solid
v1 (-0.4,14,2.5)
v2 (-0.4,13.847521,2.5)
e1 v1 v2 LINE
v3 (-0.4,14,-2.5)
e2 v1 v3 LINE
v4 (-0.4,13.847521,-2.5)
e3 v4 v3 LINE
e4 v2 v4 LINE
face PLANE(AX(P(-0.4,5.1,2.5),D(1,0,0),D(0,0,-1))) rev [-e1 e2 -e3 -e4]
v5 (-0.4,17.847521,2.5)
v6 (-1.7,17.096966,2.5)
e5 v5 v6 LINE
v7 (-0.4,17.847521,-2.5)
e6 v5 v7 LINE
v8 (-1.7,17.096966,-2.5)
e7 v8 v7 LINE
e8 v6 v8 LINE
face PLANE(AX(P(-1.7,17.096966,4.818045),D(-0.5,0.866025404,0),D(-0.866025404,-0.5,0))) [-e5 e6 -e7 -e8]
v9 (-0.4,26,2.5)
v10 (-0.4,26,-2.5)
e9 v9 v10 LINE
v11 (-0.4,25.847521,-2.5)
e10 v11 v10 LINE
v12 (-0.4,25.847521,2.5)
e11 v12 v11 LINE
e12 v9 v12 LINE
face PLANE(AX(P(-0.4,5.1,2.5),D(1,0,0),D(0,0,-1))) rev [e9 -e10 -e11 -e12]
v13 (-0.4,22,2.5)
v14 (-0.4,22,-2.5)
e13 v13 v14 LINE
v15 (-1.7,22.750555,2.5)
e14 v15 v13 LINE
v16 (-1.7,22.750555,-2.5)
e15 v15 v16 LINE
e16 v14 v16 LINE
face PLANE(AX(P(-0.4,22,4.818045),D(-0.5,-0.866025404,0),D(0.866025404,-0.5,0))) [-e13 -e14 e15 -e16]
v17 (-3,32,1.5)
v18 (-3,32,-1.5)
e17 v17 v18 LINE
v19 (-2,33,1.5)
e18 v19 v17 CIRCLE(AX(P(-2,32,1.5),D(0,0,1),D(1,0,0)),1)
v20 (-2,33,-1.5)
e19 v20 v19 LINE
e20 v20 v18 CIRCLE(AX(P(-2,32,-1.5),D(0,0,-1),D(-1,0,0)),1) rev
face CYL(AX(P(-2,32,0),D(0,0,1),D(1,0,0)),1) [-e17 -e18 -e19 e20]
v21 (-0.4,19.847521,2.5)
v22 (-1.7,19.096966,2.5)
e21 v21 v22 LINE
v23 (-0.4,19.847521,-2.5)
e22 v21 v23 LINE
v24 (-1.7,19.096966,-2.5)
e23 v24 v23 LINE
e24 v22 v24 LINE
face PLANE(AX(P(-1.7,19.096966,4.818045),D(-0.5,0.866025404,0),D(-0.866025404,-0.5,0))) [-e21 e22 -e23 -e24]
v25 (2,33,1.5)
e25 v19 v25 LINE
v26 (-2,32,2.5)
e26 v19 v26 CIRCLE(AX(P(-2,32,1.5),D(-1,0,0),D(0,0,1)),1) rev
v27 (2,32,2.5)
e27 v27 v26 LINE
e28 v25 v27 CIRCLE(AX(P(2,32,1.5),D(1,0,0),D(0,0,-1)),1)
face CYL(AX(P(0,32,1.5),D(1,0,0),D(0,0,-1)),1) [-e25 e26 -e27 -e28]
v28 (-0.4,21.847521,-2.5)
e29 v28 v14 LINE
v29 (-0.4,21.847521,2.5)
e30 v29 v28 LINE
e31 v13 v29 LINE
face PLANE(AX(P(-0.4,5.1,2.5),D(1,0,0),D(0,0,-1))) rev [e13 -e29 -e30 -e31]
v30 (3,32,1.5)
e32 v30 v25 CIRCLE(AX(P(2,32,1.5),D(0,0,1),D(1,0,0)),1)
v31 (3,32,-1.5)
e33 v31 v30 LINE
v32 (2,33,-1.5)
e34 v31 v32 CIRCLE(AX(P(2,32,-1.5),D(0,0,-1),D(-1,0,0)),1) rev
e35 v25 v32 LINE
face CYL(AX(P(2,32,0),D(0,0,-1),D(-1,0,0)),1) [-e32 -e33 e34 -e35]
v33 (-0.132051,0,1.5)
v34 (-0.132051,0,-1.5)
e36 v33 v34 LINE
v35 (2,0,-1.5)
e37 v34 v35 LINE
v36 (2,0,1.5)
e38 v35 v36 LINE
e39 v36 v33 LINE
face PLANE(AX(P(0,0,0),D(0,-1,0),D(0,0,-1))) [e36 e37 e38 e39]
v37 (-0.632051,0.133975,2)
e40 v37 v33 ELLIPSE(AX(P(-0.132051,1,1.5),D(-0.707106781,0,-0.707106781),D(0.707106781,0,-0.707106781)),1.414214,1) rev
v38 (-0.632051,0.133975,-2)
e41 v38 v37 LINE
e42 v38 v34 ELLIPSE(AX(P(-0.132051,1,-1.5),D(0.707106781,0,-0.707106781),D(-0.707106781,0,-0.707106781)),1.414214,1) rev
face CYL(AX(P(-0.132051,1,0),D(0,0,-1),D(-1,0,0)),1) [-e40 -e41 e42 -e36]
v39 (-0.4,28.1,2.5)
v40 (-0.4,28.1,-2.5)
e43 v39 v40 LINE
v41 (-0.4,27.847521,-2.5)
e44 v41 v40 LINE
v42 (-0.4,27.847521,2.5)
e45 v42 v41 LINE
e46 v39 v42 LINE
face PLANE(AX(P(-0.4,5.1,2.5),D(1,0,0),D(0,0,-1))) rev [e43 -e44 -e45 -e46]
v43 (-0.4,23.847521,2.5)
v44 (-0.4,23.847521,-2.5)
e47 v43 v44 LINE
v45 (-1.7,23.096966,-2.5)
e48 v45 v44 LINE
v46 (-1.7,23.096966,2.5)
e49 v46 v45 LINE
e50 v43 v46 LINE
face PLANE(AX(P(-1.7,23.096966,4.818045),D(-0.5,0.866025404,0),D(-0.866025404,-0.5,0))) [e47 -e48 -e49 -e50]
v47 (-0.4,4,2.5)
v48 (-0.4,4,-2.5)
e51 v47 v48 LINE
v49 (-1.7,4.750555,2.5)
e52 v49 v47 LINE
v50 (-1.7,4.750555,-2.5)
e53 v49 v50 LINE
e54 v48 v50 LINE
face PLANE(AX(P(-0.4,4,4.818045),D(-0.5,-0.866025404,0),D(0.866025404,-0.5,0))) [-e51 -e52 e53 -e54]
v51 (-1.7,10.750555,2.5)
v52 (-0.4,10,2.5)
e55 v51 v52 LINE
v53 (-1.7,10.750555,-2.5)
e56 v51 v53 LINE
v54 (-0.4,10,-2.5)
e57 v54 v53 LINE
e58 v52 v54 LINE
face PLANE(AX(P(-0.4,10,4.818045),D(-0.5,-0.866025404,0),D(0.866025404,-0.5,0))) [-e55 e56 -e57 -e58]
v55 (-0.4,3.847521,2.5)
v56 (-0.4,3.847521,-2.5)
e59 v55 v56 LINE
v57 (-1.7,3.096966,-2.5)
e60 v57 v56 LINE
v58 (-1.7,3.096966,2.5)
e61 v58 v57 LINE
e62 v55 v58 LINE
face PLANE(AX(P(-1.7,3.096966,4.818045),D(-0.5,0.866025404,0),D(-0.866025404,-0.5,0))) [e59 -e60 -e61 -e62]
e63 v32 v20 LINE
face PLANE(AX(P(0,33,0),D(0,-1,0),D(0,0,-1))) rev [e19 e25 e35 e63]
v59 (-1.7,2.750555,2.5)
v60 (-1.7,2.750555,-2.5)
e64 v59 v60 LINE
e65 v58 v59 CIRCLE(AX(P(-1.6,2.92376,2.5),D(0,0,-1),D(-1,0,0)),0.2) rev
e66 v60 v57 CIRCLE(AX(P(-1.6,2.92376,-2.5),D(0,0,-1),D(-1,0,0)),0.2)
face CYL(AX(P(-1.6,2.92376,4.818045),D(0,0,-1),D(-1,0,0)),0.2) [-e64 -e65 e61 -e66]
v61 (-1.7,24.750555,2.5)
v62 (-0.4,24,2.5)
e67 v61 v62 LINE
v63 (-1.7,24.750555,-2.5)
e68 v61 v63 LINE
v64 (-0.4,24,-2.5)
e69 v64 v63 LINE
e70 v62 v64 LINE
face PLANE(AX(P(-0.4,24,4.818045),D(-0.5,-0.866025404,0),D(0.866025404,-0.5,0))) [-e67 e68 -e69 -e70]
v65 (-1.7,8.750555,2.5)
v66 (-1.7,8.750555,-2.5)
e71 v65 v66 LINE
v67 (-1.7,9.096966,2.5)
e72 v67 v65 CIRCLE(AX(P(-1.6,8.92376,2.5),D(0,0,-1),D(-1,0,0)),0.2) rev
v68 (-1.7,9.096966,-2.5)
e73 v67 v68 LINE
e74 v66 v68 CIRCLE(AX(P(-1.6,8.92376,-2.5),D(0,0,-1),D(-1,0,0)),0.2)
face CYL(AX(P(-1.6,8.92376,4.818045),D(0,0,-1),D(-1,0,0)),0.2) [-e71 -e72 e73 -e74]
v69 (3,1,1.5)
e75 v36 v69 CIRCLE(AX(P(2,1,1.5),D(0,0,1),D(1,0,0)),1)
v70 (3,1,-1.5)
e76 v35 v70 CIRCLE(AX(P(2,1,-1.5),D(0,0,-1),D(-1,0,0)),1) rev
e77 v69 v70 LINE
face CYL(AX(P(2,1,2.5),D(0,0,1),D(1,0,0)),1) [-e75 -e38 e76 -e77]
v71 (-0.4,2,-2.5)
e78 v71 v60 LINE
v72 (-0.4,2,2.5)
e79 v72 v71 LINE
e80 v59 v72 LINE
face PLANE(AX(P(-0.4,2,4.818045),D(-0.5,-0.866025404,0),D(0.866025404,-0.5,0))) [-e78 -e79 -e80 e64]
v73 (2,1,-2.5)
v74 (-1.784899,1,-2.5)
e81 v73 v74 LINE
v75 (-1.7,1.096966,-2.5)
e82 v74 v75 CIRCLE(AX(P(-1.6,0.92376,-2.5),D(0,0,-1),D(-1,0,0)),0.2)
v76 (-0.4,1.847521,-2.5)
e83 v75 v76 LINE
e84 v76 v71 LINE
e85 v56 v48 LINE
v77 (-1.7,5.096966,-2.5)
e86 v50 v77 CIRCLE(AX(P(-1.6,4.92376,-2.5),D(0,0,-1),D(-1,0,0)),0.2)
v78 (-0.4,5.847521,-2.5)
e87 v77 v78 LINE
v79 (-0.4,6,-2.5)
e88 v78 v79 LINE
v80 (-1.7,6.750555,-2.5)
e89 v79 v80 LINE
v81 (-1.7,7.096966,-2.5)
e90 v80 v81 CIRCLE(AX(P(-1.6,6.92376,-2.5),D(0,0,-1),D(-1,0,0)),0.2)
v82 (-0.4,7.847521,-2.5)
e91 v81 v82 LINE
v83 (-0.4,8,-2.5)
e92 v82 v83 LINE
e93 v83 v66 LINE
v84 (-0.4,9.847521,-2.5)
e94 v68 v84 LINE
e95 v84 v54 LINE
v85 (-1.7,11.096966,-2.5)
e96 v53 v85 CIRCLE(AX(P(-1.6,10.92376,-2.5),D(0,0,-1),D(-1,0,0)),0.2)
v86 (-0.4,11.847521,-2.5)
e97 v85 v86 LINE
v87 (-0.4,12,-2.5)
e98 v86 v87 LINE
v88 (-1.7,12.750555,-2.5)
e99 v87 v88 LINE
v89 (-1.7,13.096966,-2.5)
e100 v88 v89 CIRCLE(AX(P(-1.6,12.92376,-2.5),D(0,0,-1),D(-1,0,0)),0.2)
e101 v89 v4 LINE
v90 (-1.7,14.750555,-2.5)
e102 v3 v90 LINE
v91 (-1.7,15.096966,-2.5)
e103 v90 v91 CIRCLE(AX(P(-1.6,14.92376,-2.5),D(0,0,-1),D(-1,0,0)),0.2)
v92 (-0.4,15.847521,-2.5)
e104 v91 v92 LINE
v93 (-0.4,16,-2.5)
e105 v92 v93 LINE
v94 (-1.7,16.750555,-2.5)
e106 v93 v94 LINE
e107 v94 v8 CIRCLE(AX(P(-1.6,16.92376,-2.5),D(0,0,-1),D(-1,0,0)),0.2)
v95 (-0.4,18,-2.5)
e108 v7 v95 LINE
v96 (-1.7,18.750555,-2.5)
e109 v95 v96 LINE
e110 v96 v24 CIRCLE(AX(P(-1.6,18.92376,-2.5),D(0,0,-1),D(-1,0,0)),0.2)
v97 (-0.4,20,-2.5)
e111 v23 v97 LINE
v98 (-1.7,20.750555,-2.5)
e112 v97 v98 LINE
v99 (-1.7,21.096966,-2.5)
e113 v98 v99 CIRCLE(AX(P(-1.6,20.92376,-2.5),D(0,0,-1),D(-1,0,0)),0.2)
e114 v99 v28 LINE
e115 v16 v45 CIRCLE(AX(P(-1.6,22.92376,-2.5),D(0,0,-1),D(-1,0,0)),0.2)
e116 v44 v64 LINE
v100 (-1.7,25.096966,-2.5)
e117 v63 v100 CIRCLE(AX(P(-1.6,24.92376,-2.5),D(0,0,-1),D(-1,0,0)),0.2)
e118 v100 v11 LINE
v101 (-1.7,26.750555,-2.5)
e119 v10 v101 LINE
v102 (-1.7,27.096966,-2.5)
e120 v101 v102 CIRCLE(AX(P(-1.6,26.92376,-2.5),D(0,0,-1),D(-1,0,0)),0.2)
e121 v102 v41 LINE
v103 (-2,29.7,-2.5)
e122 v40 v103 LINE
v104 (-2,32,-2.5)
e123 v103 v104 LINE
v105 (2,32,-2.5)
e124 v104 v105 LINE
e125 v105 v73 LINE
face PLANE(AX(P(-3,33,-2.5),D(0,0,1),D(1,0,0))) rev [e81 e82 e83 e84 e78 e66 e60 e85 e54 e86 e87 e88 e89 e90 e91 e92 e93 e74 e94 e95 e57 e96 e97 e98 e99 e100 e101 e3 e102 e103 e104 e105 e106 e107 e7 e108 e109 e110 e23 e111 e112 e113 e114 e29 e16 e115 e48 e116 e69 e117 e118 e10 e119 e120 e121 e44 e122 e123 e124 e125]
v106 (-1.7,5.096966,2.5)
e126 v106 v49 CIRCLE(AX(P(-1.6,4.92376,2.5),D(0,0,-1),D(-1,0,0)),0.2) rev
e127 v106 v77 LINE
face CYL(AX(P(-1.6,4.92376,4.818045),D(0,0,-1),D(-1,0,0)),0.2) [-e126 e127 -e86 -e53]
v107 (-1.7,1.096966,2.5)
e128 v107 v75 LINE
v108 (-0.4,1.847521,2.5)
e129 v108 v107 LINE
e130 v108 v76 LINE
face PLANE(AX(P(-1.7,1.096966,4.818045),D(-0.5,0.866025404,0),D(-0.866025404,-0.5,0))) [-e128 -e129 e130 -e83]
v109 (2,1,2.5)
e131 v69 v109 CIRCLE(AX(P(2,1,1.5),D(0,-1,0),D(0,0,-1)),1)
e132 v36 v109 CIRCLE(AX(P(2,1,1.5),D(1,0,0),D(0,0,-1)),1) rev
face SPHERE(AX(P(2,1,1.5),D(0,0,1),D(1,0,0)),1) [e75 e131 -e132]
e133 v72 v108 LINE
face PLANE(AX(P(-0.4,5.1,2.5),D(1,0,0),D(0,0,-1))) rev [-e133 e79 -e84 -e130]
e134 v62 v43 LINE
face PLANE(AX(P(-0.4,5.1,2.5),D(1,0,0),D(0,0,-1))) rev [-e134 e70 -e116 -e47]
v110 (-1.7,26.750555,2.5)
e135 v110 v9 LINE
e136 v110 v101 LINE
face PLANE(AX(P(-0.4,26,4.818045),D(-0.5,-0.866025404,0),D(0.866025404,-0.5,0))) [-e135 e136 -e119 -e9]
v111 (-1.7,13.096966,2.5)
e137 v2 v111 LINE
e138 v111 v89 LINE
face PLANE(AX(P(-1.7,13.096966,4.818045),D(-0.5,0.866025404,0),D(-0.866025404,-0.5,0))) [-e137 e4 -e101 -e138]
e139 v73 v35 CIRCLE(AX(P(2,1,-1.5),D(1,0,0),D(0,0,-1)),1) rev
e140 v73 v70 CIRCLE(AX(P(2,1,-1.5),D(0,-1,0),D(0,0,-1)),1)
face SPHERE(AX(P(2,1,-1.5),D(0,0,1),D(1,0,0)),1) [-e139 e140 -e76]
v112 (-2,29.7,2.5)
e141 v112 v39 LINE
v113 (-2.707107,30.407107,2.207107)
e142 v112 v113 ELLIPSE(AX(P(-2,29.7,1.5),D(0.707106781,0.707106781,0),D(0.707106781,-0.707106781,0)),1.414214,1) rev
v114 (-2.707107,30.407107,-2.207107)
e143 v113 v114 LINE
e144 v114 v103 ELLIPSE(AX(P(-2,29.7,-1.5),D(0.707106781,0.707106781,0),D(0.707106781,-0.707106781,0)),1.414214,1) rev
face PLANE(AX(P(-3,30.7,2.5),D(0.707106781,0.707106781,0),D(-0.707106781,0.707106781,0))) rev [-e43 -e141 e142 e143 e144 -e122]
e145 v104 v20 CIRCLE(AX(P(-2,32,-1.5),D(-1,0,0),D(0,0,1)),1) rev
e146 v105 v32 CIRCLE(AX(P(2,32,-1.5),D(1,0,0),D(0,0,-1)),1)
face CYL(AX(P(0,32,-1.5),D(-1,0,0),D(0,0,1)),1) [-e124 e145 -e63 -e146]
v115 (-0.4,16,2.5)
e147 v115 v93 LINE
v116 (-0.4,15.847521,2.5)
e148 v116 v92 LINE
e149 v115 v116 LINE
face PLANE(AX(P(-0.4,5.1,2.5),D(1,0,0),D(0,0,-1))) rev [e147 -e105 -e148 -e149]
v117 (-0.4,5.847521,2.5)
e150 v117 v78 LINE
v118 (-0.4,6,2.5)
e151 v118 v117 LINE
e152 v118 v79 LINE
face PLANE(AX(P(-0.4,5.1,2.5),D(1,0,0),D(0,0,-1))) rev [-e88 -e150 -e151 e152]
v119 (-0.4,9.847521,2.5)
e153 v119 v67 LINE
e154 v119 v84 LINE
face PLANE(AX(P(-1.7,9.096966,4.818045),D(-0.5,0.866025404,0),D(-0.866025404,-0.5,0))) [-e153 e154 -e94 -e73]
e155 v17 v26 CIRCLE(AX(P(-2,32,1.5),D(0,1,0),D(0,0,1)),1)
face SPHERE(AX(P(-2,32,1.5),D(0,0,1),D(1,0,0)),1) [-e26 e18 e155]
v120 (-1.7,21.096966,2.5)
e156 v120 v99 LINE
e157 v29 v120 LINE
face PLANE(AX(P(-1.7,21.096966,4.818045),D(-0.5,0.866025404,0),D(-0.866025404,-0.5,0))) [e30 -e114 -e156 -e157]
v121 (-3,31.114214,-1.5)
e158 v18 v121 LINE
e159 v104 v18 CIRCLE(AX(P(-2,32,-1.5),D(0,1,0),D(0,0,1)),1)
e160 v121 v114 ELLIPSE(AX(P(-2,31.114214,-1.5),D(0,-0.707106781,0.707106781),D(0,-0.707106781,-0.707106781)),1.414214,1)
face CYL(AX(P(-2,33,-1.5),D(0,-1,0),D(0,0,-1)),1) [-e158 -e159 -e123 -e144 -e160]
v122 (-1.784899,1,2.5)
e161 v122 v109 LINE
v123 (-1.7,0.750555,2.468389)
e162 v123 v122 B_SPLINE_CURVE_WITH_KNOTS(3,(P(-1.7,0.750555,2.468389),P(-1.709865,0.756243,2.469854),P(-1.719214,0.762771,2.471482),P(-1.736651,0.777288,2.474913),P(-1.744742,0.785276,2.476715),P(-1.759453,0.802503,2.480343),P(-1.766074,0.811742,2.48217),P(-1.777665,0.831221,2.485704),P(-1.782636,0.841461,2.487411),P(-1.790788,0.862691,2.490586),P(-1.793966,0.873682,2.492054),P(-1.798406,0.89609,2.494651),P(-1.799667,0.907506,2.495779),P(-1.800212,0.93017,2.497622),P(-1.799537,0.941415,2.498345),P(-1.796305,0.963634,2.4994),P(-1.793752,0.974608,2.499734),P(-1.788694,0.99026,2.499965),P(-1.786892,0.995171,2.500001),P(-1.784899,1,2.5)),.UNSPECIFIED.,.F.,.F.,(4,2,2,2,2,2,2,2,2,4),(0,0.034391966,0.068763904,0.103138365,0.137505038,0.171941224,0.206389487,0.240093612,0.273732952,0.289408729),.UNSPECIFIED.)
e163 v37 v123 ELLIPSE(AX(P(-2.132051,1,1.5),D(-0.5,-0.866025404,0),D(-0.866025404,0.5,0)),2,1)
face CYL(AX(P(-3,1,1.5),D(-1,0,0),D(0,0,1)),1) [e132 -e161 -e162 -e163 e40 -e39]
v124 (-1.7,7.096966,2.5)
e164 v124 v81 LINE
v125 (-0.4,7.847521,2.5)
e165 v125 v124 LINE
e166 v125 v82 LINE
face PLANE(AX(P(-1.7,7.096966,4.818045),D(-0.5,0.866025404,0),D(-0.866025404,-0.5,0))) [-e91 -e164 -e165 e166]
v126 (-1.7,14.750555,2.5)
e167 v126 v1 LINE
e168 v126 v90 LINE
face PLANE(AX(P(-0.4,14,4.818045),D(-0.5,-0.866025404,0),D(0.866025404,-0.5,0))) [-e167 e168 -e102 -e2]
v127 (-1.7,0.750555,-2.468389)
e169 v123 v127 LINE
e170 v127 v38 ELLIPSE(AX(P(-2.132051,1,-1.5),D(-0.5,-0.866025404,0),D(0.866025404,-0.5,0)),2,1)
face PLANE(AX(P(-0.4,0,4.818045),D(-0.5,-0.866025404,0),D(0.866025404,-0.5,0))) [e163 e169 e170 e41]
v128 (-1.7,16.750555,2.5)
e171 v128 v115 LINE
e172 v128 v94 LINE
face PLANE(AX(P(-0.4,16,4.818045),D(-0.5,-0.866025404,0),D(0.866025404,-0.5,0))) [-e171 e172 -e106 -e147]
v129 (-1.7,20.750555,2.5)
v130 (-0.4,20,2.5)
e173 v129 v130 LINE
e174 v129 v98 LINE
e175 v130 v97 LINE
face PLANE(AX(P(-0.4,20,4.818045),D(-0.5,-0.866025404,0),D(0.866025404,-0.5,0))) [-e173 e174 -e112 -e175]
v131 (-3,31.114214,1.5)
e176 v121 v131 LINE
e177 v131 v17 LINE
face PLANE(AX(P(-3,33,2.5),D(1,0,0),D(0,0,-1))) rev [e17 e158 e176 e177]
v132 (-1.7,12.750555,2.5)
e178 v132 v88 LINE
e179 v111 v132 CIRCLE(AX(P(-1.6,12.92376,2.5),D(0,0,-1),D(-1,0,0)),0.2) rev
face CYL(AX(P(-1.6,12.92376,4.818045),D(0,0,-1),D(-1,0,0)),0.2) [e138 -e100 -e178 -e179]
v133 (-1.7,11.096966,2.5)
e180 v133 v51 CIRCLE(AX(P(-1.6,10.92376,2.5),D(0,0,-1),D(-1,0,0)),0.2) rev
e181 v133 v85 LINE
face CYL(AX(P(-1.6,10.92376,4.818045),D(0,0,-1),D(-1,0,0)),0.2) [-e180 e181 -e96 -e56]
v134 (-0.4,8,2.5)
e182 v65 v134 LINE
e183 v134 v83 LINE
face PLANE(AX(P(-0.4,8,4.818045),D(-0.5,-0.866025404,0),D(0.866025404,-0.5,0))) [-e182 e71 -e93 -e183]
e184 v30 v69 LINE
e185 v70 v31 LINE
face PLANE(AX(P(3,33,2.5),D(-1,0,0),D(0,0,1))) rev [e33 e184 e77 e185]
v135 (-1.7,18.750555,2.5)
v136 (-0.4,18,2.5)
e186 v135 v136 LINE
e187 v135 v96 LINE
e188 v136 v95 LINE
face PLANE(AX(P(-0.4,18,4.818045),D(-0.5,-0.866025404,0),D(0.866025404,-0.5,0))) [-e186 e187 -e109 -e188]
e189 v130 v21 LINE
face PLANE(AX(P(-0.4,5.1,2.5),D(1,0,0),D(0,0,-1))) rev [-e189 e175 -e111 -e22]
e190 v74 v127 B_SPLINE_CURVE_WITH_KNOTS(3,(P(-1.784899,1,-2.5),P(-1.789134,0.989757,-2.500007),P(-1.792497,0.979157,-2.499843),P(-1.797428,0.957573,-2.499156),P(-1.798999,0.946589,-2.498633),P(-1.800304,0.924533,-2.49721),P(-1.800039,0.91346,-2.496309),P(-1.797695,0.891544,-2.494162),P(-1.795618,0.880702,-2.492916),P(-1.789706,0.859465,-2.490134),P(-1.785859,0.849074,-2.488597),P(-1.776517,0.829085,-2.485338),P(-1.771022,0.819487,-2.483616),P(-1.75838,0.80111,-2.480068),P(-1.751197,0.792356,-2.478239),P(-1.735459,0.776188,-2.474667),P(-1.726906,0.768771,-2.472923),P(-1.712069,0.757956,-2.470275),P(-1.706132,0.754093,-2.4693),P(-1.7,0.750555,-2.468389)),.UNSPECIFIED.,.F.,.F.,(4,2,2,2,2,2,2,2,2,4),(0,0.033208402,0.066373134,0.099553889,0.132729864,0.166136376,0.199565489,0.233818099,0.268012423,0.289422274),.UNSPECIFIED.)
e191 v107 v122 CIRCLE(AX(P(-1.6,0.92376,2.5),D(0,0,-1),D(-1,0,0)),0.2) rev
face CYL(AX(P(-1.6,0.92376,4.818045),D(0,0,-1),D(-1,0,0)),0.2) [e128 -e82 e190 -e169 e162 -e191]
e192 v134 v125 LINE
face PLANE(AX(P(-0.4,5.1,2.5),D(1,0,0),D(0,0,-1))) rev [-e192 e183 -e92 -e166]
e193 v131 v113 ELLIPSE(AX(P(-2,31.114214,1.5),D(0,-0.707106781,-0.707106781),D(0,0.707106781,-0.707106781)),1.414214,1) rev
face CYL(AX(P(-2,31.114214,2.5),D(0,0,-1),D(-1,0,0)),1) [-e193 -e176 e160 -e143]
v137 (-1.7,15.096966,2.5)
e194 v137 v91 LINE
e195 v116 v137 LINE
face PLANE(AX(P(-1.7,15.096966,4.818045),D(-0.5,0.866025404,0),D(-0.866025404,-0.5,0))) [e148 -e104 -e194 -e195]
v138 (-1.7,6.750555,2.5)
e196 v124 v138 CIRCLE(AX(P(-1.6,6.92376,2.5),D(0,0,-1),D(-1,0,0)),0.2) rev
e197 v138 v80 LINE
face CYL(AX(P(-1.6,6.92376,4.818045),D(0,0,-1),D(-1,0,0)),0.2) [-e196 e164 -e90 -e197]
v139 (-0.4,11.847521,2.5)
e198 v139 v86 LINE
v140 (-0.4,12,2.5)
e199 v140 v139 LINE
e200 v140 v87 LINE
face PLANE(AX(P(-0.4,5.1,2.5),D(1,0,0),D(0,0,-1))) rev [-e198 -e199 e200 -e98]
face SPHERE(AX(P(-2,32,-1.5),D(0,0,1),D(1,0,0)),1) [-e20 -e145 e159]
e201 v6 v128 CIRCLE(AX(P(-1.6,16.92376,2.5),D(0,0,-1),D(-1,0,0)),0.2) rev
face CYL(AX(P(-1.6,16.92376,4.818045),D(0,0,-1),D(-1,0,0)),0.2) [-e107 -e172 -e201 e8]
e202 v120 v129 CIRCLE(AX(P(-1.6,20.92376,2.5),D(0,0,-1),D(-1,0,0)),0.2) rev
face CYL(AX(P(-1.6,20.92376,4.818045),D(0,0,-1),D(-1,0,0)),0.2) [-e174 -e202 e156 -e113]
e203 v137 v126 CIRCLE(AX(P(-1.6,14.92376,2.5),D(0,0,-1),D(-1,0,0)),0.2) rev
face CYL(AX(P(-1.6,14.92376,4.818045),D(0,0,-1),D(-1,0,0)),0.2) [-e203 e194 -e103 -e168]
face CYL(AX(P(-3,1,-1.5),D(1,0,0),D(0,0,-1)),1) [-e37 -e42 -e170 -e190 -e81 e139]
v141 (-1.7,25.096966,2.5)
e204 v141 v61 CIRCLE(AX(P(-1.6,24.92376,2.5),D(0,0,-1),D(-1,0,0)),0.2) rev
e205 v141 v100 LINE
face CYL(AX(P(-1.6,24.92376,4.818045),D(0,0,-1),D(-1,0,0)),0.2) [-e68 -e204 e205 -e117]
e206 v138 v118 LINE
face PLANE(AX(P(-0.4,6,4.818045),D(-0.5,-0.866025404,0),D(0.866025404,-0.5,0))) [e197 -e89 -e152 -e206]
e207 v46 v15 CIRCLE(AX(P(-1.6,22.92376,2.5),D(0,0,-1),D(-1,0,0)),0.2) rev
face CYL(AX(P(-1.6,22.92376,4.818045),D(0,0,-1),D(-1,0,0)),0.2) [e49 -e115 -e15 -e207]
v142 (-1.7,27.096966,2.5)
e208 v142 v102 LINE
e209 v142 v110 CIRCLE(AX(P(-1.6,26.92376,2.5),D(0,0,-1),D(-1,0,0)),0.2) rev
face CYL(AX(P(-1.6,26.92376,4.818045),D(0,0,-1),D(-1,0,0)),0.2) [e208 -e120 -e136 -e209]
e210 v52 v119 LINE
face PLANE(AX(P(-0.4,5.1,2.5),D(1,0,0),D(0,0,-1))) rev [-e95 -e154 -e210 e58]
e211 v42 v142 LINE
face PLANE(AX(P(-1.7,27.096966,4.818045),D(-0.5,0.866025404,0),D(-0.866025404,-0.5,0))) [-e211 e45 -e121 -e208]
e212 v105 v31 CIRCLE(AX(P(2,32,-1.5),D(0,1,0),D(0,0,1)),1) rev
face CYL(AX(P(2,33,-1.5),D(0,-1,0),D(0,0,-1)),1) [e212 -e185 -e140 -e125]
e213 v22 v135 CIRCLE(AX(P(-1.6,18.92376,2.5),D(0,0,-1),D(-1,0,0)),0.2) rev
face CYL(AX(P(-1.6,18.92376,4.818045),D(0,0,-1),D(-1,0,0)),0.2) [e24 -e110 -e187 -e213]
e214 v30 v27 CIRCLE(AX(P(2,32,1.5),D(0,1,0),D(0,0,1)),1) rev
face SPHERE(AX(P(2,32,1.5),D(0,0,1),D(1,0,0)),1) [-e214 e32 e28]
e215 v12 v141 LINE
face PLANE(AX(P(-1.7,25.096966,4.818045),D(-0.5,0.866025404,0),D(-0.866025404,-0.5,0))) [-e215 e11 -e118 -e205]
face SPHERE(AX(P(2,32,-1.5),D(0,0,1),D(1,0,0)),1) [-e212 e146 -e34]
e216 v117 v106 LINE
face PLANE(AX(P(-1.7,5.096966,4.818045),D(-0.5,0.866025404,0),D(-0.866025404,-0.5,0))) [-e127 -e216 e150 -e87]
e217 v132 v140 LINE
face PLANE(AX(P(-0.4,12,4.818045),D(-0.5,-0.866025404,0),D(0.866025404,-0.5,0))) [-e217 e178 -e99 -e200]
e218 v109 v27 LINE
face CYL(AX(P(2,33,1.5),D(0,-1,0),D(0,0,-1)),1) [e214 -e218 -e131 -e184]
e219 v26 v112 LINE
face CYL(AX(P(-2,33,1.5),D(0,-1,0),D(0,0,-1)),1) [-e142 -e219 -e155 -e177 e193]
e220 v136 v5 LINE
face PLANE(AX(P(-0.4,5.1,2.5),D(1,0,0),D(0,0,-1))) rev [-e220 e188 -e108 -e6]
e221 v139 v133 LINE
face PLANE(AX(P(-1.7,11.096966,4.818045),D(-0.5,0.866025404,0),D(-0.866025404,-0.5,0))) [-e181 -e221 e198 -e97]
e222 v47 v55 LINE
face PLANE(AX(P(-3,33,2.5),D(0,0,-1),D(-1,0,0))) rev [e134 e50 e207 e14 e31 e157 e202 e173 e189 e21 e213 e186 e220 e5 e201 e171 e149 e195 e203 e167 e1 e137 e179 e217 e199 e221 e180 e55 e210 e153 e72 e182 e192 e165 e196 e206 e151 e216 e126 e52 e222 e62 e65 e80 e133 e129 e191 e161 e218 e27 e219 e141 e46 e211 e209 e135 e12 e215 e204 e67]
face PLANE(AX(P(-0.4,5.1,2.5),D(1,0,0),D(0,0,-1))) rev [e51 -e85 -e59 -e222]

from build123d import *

# Parameters (mm, degrees)
SKETCH1_W               = 6
SKETCH1_H               = 5
BOSS_EXTRUDE1_DEPTH     = 33
CUT_EXTRUDE1_DEPTH      = 34.51119216
CUT_EXTRUDE1_DEPTH_BACK = 34.51119216
BOSS_EXTRUDE2_DEPTH     = 5
LPATTERN1_COUNT         = 14
LPATTERN1_PITCH         = 2
FILLET1_R               = 1


with BuildPart() as part:
    # Sketch1 → Boss-Extrude1 (new body)
    with BuildSketch(Plane(origin=(0, 0, 0), x_dir=(1, 0, 0), z_dir=(0, 1, 0))):
        Rectangle(SKETCH1_W, SKETCH1_H)
    extrude(amount=BOSS_EXTRUDE1_DEPTH)

    # Sketch2 → Cut-Extrude1 (cut, two sides: drawn at the far end of the back side and taken through both)
    with BuildSketch(Plane(origin=(0, 0, -2.5), x_dir=(-1, 0, 0), z_dir=(0, 0, -1)).offset(-CUT_EXTRUDE1_DEPTH_BACK)):
        Polygon((3, 2.5), (3, 30.7), (0.4, 28.1), (0.4, 5.1), (0.4, 0), (3, 0), align=None)
    extrude(amount=CUT_EXTRUDE1_DEPTH + CUT_EXTRUDE1_DEPTH_BACK, mode=Mode.SUBTRACT)

    # Sketch3 → Boss-Extrude2 (add)
    with BuildSketch(Plane(origin=(0, 0, -2.5), x_dir=(-1, 0, 0), z_dir=(0, 0, -1))):
        with BuildLine():
            Line((0.4, 0), (1.7, 0.75055535))
            ThreePointArc((1.7, 0.75055535), (1.8, 0.923760431), (1.7, 1.096965511))
            Line((1.7, 1.096965511), (0.4, 1.847520861))
            Line((0.4, 1.847520861), (0.4, 0))
        make_face()
    boss_extrude2 = extrude(amount=-BOSS_EXTRUDE2_DEPTH)

    # LPattern1: Boss-Extrude2 ×14
    with Locations(*[(0, i * LPATTERN1_PITCH, 0) for i in range(1, LPATTERN1_COUNT)]):
        add(boss_extrude2)

    # Fillet1
    # the kernel refuses this fillet: 1 mm, written as the material it takes off along each edge
    with BuildSketch(Plane(origin=(2, 1, -1.5), x_dir=(1, 0, 0), z_dir=(0, 0, -1))) as fillet1_piece_1_section:
        Polygon((0, 0), (FILLET1_R, 0), (FILLET1_R, FILLET1_R), (0, FILLET1_R), align=None)
    fillet1_piece_1 = extrude(amount=FILLET1_R, mode=Mode.PRIVATE)
    fillet1_piece_1 = fillet1_piece_1 - Plane(origin=(2, 1, -1.5), x_dir=(-0.7071067811865475, 0.7071067811865475, 0), z_dir=(0, 0, -1)) * Sphere(FILLET1_R, mode=Mode.PRIVATE)
    add(fillet1_piece_1, mode=Mode.SUBTRACT)
    with BuildSketch(Plane(origin=(2, 1, 1.5), x_dir=(1, 0, 0), z_dir=(0, 0, 1))) as fillet1_piece_2_section:
        Polygon((0, 0), (FILLET1_R, 0), (FILLET1_R, -FILLET1_R), (0, -FILLET1_R), align=None)
    fillet1_piece_2 = extrude(amount=FILLET1_R, mode=Mode.PRIVATE)
    fillet1_piece_2 = fillet1_piece_2 - Plane(origin=(2, 1, 1.5), x_dir=(-0.7071067811865475, 0.7071067811865475, 0), z_dir=(0, 0, 1)) * Sphere(FILLET1_R, mode=Mode.PRIVATE)
    add(fillet1_piece_2, mode=Mode.SUBTRACT)
    with BuildSketch(Plane(origin=(-2, 32, -1.5), x_dir=(-1, 0, 0), z_dir=(0, 0, -1))) as fillet1_piece_3_section:
        Polygon((0, 0), (FILLET1_R, 0), (FILLET1_R, FILLET1_R), (0, FILLET1_R), align=None)
    fillet1_piece_3 = extrude(amount=FILLET1_R, mode=Mode.PRIVATE)
    fillet1_piece_3 = fillet1_piece_3 - Plane(origin=(-2, 32, -1.5), x_dir=(0.7071067811865475, -0.7071067811865475, 0), z_dir=(0, 0, -1)) * Sphere(FILLET1_R, mode=Mode.PRIVATE)
    add(fillet1_piece_3, mode=Mode.SUBTRACT)
    with BuildSketch(Plane(origin=(-2, 32, 1.5), x_dir=(-1, 0, 0), z_dir=(0, 0, 1))) as fillet1_piece_4_section:
        Polygon((0, 0), (FILLET1_R, 0), (FILLET1_R, -FILLET1_R), (0, -FILLET1_R), align=None)
    fillet1_piece_4 = extrude(amount=FILLET1_R, mode=Mode.PRIVATE)
    fillet1_piece_4 = fillet1_piece_4 - Plane(origin=(-2, 32, 1.5), x_dir=(0.7071067811865475, -0.7071067811865475, 0), z_dir=(0, 0, 1)) * Sphere(FILLET1_R, mode=Mode.PRIVATE)
    add(fillet1_piece_4, mode=Mode.SUBTRACT)
    with BuildSketch(Plane(origin=(2, 32, 1.5), x_dir=(0, 1, 0), z_dir=(0, 0, 1))) as fillet1_piece_5_section:
        Polygon((0, 0), (FILLET1_R, 0), (FILLET1_R, -FILLET1_R), (0, -FILLET1_R), align=None)
    fillet1_piece_5 = extrude(amount=FILLET1_R, mode=Mode.PRIVATE)
    fillet1_piece_5 = fillet1_piece_5 - Plane(origin=(2, 32, 1.5), x_dir=(-0.7071067811865475, -0.7071067811865475, 0), z_dir=(0, 0, 1)) * Sphere(FILLET1_R, mode=Mode.PRIVATE)
    add(fillet1_piece_5, mode=Mode.SUBTRACT)
    with BuildSketch(Plane(origin=(2, 32, -1.5), x_dir=(0, 1, 0), z_dir=(0, 0, -1))) as fillet1_piece_6_section:
        Polygon((0, 0), (FILLET1_R, 0), (FILLET1_R, FILLET1_R), (0, FILLET1_R), align=None)
    fillet1_piece_6 = extrude(amount=FILLET1_R, mode=Mode.PRIVATE)
    fillet1_piece_6 = fillet1_piece_6 - Plane(origin=(2, 32, -1.5), x_dir=(-0.7071067811865475, -0.7071067811865475, 0), z_dir=(0, 0, -1)) * Sphere(FILLET1_R, mode=Mode.PRIVATE)
    add(fillet1_piece_6, mode=Mode.SUBTRACT)
    with BuildSketch(Plane(origin=(2, 0, -2.5), x_dir=(0, 0, 1), z_dir=(-1, 0, 0))) as fillet1_piece_7:
        with BuildLine():
            CenterArc((FILLET1_R, FILLET1_R), FILLET1_R, 180, 90)
            Line((0, FILLET1_R), (0, 0))
            Line((0, 0), (FILLET1_R, 0))
        make_face()
    extrude(amount=4.9, mode=Mode.SUBTRACT)
    with BuildSketch(Plane(origin=(-2.9, 0, 2.5), x_dir=(0, 1, 0), z_dir=(1, 0, 0))) as fillet1_piece_8:
        with BuildLine():
            CenterArc((FILLET1_R, -FILLET1_R), FILLET1_R, 90, 90)
            Line((0, -FILLET1_R), (0, 0))
            Line((0, 0), (FILLET1_R, 0))
        make_face()
    extrude(amount=4.9, mode=Mode.SUBTRACT)
    with BuildSketch(Plane(origin=(-3, 33, -1.5), x_dir=(0, -1, 0), z_dir=(0, 0, 1))) as fillet1_piece_9:
        with BuildLine():
            CenterArc((FILLET1_R, FILLET1_R), FILLET1_R, 180, 90)
            Line((0, FILLET1_R), (0, 0))
            Line((0, 0), (FILLET1_R, 0))
        make_face()
    extrude(amount=3, mode=Mode.SUBTRACT)
    with BuildSketch(Plane(origin=(-3, 28.2, 2.5), x_dir=(1, 0, 0), z_dir=(0, 1, 0)), Plane(origin=(-3, 28.2, -2.5), x_dir=(0, 0, 1), z_dir=(0, 1, 0))) as fillet1_piece_10:
        with BuildLine():
            CenterArc((FILLET1_R, FILLET1_R), FILLET1_R, 180, 90)
            Line((0, FILLET1_R), (0, 0))
            Line((0, 0), (FILLET1_R, 0))
        make_face()
    extrude(amount=3.8, mode=Mode.SUBTRACT)
    with BuildSketch(Plane(origin=(-3, 30.7, 3.535533906), x_dir=(0.7071067811865411, -0.7071067811865539, 0), z_dir=(0, 0, -1))) as fillet1_piece_11:
        with BuildLine():
            CenterArc((FILLET1_R * 0.414213562373, -FILLET1_R), FILLET1_R, 90, 45)
            Line((-FILLET1_R * 0.292893218813, -FILLET1_R * 0.292893218813), (0, 0))
            Line((0, 0), (FILLET1_R * 0.414213562373, 0))
        make_face()
    extrude(amount=7.071067812, mode=Mode.SUBTRACT)
    with BuildSketch(Plane(origin=(3, 1, 2.5), x_dir=(-1, 0, 0), z_dir=(0, 1, 0)), Plane(origin=(3, 1, -2.5), x_dir=(0, 0, 1), z_dir=(0, 1, 0))) as fillet1_piece_12:
        with BuildLine():
            CenterArc((FILLET1_R, -FILLET1_R), FILLET1_R, 90, 90)
            Line((0, -FILLET1_R), (0, 0))
            Line((0, 0), (FILLET1_R, 0))
        make_face()
    extrude(amount=31, mode=Mode.SUBTRACT)
    with BuildSketch(Plane(origin=(3, 33, 1.5), x_dir=(-1, 0, 0), z_dir=(0, 0, -1)), Plane(origin=(3, 0, 1.5), x_dir=(0, 1, 0), z_dir=(0, 0, -1))) as fillet1_piece_13:
        with BuildLine():
            CenterArc((FILLET1_R, -FILLET1_R), FILLET1_R, 90, 90)
            Line((0, -FILLET1_R), (0, 0))
            Line((0, 0), (FILLET1_R, 0))
        make_face()
    extrude(amount=3, mode=Mode.SUBTRACT)
    with BuildSketch(Plane(origin=(-2, 33, 2.5), x_dir=(0, -1, 0), z_dir=(1, 0, 0))) as fillet1_piece_14:
        with BuildLine():
            CenterArc((FILLET1_R, FILLET1_R), FILLET1_R, 180, 90)
            Line((0, FILLET1_R), (0, 0))
            Line((0, 0), (FILLET1_R, 0))
        make_face()
    extrude(amount=4, mode=Mode.SUBTRACT)
    with BuildSketch(Plane(origin=(2, 33, -2.5), x_dir=(0, 0, 1), z_dir=(-1, 0, 0))) as fillet1_piece_15:
        with BuildLine():
            CenterArc((FILLET1_R, -FILLET1_R), FILLET1_R, 90, 90)
            Line((0, -FILLET1_R), (0, 0))
            Line((0, 0), (FILLET1_R, 0))
        make_face()
    extrude(amount=4, mode=Mode.SUBTRACT)
    with BuildSketch(Plane(origin=(-0.4, 0, -3.169872981), x_dir=(1, 0, 0), z_dir=(0, 0, 1))) as fillet1_piece_16:
        with BuildLine():
            CenterArc((FILLET1_R * 0.267949192431, FILLET1_R), FILLET1_R, 240, 30)
            Line((-FILLET1_R * 0.232050807569, FILLET1_R * 0.133974596216), (0, 0))
            Line((0, 0), (FILLET1_R * 0.267949192431, 0))
        make_face()
    extrude(amount=6.339745962, mode=Mode.SUBTRACT)


solid = part.part
